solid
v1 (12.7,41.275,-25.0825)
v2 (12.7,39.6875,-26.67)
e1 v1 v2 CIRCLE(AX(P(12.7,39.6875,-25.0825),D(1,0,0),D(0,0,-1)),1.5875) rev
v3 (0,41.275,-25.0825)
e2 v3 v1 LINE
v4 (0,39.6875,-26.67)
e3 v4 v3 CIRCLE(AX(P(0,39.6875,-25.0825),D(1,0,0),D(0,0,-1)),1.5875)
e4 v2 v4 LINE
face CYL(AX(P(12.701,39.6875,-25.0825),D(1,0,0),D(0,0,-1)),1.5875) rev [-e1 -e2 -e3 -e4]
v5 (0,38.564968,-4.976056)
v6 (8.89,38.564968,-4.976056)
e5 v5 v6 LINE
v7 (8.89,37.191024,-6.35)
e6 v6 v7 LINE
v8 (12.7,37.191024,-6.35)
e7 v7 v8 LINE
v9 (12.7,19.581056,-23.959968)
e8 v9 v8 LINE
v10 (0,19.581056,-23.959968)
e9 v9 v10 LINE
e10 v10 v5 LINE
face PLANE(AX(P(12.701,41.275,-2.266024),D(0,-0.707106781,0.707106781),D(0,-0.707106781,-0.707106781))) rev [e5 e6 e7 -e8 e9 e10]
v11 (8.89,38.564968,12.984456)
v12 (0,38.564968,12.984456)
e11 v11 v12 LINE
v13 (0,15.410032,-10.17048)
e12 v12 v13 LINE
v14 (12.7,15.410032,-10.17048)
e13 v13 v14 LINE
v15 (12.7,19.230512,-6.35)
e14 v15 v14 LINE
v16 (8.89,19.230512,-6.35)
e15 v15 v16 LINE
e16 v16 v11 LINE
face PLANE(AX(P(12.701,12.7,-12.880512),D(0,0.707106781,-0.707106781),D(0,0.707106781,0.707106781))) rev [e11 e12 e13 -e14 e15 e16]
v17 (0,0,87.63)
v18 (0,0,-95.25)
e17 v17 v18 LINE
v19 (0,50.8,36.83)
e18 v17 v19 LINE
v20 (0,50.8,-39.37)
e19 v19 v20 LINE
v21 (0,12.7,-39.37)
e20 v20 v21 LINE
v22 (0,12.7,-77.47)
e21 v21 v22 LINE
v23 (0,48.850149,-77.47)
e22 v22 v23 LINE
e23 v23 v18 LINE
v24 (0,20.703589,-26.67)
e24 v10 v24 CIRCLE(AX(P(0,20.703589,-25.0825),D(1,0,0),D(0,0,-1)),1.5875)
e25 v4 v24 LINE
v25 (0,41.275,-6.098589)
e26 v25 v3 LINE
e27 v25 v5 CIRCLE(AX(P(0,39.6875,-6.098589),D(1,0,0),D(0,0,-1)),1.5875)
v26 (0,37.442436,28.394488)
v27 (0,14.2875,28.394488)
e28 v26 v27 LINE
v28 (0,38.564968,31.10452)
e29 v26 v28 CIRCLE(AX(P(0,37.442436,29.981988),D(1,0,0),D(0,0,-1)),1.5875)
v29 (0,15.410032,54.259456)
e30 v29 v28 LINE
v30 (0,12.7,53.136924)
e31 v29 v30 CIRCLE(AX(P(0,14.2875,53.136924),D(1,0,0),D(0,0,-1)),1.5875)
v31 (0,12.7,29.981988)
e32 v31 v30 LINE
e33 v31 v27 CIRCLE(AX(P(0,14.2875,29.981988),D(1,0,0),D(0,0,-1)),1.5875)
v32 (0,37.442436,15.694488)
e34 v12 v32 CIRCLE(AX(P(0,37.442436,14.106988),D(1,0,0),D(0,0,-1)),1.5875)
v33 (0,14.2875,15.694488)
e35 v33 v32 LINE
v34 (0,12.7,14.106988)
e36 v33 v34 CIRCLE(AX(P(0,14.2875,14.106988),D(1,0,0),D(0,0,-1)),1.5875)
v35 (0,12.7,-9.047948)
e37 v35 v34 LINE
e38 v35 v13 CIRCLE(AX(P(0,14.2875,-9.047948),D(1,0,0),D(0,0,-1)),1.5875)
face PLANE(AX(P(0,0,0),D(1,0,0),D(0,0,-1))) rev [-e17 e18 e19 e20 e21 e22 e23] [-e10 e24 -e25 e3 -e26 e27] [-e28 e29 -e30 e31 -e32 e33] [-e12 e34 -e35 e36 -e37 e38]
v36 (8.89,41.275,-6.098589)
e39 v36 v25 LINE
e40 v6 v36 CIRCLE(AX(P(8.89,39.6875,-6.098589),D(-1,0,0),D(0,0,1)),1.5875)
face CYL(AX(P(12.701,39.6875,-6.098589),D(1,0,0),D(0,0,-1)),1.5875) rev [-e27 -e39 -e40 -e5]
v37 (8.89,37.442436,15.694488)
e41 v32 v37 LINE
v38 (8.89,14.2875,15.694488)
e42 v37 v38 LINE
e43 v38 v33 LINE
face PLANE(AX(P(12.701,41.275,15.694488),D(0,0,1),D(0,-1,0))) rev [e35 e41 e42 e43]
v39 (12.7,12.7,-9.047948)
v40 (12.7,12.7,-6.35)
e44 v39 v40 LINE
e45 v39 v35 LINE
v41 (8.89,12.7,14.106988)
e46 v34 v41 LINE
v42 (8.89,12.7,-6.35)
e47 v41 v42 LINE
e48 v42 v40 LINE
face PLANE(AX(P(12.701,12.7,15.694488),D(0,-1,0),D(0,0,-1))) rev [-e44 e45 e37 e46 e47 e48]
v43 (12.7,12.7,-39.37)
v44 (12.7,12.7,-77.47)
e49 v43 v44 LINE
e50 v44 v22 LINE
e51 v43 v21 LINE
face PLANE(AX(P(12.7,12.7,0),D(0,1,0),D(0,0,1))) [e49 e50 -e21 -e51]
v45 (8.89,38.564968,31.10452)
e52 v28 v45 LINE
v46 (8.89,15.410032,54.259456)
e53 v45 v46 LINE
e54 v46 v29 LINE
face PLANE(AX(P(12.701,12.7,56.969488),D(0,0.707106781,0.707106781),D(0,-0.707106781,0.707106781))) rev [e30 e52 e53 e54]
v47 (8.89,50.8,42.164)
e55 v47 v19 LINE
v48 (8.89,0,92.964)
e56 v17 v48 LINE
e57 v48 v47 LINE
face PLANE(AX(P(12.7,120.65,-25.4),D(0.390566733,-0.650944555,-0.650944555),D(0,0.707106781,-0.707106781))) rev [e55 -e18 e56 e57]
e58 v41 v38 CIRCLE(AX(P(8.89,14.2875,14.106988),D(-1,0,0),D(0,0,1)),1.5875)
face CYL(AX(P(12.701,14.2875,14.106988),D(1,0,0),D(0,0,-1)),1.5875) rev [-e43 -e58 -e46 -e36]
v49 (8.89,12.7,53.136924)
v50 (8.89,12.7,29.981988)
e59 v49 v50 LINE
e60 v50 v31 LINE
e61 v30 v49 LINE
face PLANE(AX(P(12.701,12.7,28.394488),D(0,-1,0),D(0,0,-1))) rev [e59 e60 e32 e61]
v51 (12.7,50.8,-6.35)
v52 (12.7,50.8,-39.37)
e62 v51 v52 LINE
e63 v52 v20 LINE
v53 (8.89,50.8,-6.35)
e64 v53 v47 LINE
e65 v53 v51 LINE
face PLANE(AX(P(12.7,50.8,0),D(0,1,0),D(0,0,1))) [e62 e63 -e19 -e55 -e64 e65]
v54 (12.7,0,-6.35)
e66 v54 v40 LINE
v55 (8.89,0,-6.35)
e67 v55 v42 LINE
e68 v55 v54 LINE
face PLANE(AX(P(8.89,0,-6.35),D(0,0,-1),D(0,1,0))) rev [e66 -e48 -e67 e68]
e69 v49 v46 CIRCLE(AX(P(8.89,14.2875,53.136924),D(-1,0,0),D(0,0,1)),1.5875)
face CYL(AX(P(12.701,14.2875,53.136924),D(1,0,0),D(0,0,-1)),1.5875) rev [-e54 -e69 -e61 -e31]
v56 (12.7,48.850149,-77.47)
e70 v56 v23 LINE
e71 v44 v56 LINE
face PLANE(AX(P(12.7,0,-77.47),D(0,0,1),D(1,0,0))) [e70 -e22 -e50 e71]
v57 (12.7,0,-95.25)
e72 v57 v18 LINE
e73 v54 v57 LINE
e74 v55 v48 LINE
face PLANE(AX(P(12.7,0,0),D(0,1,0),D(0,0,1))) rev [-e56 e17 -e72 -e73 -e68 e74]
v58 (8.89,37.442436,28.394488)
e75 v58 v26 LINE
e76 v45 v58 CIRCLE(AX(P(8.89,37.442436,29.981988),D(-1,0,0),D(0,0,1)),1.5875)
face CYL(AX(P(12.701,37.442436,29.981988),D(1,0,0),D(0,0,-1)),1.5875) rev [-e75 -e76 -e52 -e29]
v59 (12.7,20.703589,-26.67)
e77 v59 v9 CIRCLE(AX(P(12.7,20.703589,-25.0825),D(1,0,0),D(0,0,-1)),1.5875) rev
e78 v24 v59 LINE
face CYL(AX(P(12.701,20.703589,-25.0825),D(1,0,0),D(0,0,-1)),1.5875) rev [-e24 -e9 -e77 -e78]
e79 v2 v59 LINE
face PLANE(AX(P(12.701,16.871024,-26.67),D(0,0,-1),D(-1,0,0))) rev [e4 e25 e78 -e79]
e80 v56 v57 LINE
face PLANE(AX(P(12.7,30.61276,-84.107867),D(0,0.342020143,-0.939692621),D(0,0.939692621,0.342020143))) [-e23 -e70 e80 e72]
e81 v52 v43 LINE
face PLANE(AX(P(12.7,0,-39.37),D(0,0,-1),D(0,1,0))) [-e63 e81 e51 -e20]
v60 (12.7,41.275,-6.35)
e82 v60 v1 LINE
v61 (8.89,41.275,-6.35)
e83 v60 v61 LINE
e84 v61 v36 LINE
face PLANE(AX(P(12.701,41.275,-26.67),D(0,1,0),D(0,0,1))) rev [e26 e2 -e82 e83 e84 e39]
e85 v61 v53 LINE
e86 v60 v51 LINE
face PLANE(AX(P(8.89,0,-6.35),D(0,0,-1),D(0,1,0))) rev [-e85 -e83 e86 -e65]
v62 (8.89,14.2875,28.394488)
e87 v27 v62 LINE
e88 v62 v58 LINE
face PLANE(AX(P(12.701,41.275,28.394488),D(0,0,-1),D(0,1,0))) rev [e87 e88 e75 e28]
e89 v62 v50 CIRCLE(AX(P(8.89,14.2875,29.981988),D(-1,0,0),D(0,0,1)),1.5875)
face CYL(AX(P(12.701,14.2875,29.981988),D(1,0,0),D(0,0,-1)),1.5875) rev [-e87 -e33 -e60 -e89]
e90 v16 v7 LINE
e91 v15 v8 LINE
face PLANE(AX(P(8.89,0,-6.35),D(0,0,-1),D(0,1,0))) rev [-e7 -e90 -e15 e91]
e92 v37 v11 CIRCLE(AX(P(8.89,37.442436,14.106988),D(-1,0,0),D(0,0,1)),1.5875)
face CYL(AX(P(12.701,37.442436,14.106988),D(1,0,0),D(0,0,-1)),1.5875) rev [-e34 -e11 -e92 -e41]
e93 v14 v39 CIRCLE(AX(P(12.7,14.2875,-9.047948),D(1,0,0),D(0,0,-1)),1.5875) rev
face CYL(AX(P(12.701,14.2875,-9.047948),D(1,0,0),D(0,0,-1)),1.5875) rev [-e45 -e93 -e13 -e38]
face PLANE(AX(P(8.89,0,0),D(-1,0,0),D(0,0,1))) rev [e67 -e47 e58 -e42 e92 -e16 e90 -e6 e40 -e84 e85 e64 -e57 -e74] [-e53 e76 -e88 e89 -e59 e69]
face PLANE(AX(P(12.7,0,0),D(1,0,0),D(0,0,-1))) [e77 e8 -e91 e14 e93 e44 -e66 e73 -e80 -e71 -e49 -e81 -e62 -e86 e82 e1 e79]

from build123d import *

# Parameters (mm, degrees)
BOSS_EXTRUDE1_DEPTH    = 12.7
CUT_EXTRUDE1_START     = -62.002468855
CUT_EXTRUDE1_OUTLINE_W = 16
CUT_EXTRUDE1_OUTLINE_H = 80
CUT_EXTRUDE1_DEPTH     = 4.960197509
CUT_EXTRUDE2_START     = 12.7
CUT_EXTRUDE2_DEPTH     = 3.81
CUT_EXTRUDE3_REACH     = 110.694
FILLET1_R              = 1.5875


# Read off the part's stored shape, not the designer's step: Cut-Extrude1
with BuildPart() as part:
    # Sketch1 → Boss-Extrude1 (new body)
    with BuildSketch(Plane(origin=(0, 0, 0), x_dir=(0, 0, -1), z_dir=(1, 0, 0))):
        Polygon((-44.45, 50.8), (-95.25, 0), (95.25, 0), (77.47, 48.850148518), (77.47, 12.7), (39.37, 12.7), (39.37, 50.8), align=None)
    extrude(amount=BOSS_EXTRUDE1_DEPTH)

    # Cut-Extrude1 outline → Cut-Extrude1 (cut)
    with BuildSketch(Plane(origin=(0, 0, 0), x_dir=(0.920574617898324, 0.27617238536949745, 0.27617238536949446), z_dir=(0.39056673294247013, -0.6509445549041233, -0.6509445549041163)).offset(CUT_EXTRUDE1_START)):
        with Locations((31, 29)):
            Rectangle(CUT_EXTRUDE1_OUTLINE_W, CUT_EXTRUDE1_OUTLINE_H)
    extrude(amount=CUT_EXTRUDE1_DEPTH, mode=Mode.SUBTRACT)

    # Sketch1<4> → Cut-Extrude2 (cut)
    with BuildSketch(Plane(origin=(0, 0, 0), x_dir=(0, 0, -1), z_dir=(1, 0, 0)).offset(CUT_EXTRUDE2_START)):
        Polygon((-44.45, 50.8), (-95.25, 0), (6.35, 0), (6.35, 50.8), align=None)
    extrude(amount=-CUT_EXTRUDE2_DEPTH, mode=Mode.SUBTRACT)

    # Sketch3 → Cut-Extrude3 (cut, up to next)
    with BuildSketch(Plane.ZY, mode=Mode.PRIVATE) as cut_extrude3_sk1:
        Polygon((56.969487758, 12.7), (28.394487758, 41.275), (28.394487758, 12.7), align=None)
    cut_extrude3_tool1 = extrude(cut_extrude3_sk1.sketch, amount=-CUT_EXTRUDE3_REACH, mode=Mode.PRIVATE) & part.part
    # Sketch3 → Cut-Extrude3 (cut, up to next)
    with BuildSketch(Plane.ZY, mode=Mode.PRIVATE) as cut_extrude3_sk2:
        Polygon((15.694487758, 41.275), (15.694487758, 12.7), (-12.880512242, 12.7), align=None)
    cut_extrude3_tool2 = extrude(cut_extrude3_sk2.sketch, amount=-CUT_EXTRUDE3_REACH, mode=Mode.PRIVATE) & part.part
    # Sketch3 → Cut-Extrude3 (cut, up to next)
    with BuildSketch(Plane.ZY, mode=Mode.PRIVATE) as cut_extrude3_sk3:
        Polygon((-2.266024484, 41.275), (-26.67, 16.871024484), (-26.67, 41.275), align=None)
    cut_extrude3_tool3 = extrude(cut_extrude3_sk3.sketch, amount=-CUT_EXTRUDE3_REACH, mode=Mode.PRIVATE) & part.part
    add(cut_extrude3_tool1.solids().sort_by_distance((0, 22.225, 37.919488))[0], mode=Mode.SUBTRACT)
    add(cut_extrude3_tool2.solids().sort_by_distance((0, 22.225, 6.169488))[0], mode=Mode.SUBTRACT)
    add(cut_extrude3_tool3.solids().sort_by_distance((0, 33.140341, -18.535341))[0], mode=Mode.SUBTRACT)

    # Fillet1
    fillet1_edges = [part.edges().sort_by_distance(p)[0] for p in [
        (4.445, 12.7, 56.969487758),
        (4.445, 12.7, 28.394487758),
        (4.445, 41.275, 28.394487758),
        (6.35, 41.275, -26.67),
        (4.445, 41.275, -2.266024484),
        (6.35, 16.871024484, -26.67),
        (4.445, 41.275, 15.694487758),
        (6.35, 12.7, -12.880512242),
        (4.445, 12.7, 15.694487758),
    ]]
    fillet(fillet1_edges, radius=FILLET1_R)


solid = part.part
